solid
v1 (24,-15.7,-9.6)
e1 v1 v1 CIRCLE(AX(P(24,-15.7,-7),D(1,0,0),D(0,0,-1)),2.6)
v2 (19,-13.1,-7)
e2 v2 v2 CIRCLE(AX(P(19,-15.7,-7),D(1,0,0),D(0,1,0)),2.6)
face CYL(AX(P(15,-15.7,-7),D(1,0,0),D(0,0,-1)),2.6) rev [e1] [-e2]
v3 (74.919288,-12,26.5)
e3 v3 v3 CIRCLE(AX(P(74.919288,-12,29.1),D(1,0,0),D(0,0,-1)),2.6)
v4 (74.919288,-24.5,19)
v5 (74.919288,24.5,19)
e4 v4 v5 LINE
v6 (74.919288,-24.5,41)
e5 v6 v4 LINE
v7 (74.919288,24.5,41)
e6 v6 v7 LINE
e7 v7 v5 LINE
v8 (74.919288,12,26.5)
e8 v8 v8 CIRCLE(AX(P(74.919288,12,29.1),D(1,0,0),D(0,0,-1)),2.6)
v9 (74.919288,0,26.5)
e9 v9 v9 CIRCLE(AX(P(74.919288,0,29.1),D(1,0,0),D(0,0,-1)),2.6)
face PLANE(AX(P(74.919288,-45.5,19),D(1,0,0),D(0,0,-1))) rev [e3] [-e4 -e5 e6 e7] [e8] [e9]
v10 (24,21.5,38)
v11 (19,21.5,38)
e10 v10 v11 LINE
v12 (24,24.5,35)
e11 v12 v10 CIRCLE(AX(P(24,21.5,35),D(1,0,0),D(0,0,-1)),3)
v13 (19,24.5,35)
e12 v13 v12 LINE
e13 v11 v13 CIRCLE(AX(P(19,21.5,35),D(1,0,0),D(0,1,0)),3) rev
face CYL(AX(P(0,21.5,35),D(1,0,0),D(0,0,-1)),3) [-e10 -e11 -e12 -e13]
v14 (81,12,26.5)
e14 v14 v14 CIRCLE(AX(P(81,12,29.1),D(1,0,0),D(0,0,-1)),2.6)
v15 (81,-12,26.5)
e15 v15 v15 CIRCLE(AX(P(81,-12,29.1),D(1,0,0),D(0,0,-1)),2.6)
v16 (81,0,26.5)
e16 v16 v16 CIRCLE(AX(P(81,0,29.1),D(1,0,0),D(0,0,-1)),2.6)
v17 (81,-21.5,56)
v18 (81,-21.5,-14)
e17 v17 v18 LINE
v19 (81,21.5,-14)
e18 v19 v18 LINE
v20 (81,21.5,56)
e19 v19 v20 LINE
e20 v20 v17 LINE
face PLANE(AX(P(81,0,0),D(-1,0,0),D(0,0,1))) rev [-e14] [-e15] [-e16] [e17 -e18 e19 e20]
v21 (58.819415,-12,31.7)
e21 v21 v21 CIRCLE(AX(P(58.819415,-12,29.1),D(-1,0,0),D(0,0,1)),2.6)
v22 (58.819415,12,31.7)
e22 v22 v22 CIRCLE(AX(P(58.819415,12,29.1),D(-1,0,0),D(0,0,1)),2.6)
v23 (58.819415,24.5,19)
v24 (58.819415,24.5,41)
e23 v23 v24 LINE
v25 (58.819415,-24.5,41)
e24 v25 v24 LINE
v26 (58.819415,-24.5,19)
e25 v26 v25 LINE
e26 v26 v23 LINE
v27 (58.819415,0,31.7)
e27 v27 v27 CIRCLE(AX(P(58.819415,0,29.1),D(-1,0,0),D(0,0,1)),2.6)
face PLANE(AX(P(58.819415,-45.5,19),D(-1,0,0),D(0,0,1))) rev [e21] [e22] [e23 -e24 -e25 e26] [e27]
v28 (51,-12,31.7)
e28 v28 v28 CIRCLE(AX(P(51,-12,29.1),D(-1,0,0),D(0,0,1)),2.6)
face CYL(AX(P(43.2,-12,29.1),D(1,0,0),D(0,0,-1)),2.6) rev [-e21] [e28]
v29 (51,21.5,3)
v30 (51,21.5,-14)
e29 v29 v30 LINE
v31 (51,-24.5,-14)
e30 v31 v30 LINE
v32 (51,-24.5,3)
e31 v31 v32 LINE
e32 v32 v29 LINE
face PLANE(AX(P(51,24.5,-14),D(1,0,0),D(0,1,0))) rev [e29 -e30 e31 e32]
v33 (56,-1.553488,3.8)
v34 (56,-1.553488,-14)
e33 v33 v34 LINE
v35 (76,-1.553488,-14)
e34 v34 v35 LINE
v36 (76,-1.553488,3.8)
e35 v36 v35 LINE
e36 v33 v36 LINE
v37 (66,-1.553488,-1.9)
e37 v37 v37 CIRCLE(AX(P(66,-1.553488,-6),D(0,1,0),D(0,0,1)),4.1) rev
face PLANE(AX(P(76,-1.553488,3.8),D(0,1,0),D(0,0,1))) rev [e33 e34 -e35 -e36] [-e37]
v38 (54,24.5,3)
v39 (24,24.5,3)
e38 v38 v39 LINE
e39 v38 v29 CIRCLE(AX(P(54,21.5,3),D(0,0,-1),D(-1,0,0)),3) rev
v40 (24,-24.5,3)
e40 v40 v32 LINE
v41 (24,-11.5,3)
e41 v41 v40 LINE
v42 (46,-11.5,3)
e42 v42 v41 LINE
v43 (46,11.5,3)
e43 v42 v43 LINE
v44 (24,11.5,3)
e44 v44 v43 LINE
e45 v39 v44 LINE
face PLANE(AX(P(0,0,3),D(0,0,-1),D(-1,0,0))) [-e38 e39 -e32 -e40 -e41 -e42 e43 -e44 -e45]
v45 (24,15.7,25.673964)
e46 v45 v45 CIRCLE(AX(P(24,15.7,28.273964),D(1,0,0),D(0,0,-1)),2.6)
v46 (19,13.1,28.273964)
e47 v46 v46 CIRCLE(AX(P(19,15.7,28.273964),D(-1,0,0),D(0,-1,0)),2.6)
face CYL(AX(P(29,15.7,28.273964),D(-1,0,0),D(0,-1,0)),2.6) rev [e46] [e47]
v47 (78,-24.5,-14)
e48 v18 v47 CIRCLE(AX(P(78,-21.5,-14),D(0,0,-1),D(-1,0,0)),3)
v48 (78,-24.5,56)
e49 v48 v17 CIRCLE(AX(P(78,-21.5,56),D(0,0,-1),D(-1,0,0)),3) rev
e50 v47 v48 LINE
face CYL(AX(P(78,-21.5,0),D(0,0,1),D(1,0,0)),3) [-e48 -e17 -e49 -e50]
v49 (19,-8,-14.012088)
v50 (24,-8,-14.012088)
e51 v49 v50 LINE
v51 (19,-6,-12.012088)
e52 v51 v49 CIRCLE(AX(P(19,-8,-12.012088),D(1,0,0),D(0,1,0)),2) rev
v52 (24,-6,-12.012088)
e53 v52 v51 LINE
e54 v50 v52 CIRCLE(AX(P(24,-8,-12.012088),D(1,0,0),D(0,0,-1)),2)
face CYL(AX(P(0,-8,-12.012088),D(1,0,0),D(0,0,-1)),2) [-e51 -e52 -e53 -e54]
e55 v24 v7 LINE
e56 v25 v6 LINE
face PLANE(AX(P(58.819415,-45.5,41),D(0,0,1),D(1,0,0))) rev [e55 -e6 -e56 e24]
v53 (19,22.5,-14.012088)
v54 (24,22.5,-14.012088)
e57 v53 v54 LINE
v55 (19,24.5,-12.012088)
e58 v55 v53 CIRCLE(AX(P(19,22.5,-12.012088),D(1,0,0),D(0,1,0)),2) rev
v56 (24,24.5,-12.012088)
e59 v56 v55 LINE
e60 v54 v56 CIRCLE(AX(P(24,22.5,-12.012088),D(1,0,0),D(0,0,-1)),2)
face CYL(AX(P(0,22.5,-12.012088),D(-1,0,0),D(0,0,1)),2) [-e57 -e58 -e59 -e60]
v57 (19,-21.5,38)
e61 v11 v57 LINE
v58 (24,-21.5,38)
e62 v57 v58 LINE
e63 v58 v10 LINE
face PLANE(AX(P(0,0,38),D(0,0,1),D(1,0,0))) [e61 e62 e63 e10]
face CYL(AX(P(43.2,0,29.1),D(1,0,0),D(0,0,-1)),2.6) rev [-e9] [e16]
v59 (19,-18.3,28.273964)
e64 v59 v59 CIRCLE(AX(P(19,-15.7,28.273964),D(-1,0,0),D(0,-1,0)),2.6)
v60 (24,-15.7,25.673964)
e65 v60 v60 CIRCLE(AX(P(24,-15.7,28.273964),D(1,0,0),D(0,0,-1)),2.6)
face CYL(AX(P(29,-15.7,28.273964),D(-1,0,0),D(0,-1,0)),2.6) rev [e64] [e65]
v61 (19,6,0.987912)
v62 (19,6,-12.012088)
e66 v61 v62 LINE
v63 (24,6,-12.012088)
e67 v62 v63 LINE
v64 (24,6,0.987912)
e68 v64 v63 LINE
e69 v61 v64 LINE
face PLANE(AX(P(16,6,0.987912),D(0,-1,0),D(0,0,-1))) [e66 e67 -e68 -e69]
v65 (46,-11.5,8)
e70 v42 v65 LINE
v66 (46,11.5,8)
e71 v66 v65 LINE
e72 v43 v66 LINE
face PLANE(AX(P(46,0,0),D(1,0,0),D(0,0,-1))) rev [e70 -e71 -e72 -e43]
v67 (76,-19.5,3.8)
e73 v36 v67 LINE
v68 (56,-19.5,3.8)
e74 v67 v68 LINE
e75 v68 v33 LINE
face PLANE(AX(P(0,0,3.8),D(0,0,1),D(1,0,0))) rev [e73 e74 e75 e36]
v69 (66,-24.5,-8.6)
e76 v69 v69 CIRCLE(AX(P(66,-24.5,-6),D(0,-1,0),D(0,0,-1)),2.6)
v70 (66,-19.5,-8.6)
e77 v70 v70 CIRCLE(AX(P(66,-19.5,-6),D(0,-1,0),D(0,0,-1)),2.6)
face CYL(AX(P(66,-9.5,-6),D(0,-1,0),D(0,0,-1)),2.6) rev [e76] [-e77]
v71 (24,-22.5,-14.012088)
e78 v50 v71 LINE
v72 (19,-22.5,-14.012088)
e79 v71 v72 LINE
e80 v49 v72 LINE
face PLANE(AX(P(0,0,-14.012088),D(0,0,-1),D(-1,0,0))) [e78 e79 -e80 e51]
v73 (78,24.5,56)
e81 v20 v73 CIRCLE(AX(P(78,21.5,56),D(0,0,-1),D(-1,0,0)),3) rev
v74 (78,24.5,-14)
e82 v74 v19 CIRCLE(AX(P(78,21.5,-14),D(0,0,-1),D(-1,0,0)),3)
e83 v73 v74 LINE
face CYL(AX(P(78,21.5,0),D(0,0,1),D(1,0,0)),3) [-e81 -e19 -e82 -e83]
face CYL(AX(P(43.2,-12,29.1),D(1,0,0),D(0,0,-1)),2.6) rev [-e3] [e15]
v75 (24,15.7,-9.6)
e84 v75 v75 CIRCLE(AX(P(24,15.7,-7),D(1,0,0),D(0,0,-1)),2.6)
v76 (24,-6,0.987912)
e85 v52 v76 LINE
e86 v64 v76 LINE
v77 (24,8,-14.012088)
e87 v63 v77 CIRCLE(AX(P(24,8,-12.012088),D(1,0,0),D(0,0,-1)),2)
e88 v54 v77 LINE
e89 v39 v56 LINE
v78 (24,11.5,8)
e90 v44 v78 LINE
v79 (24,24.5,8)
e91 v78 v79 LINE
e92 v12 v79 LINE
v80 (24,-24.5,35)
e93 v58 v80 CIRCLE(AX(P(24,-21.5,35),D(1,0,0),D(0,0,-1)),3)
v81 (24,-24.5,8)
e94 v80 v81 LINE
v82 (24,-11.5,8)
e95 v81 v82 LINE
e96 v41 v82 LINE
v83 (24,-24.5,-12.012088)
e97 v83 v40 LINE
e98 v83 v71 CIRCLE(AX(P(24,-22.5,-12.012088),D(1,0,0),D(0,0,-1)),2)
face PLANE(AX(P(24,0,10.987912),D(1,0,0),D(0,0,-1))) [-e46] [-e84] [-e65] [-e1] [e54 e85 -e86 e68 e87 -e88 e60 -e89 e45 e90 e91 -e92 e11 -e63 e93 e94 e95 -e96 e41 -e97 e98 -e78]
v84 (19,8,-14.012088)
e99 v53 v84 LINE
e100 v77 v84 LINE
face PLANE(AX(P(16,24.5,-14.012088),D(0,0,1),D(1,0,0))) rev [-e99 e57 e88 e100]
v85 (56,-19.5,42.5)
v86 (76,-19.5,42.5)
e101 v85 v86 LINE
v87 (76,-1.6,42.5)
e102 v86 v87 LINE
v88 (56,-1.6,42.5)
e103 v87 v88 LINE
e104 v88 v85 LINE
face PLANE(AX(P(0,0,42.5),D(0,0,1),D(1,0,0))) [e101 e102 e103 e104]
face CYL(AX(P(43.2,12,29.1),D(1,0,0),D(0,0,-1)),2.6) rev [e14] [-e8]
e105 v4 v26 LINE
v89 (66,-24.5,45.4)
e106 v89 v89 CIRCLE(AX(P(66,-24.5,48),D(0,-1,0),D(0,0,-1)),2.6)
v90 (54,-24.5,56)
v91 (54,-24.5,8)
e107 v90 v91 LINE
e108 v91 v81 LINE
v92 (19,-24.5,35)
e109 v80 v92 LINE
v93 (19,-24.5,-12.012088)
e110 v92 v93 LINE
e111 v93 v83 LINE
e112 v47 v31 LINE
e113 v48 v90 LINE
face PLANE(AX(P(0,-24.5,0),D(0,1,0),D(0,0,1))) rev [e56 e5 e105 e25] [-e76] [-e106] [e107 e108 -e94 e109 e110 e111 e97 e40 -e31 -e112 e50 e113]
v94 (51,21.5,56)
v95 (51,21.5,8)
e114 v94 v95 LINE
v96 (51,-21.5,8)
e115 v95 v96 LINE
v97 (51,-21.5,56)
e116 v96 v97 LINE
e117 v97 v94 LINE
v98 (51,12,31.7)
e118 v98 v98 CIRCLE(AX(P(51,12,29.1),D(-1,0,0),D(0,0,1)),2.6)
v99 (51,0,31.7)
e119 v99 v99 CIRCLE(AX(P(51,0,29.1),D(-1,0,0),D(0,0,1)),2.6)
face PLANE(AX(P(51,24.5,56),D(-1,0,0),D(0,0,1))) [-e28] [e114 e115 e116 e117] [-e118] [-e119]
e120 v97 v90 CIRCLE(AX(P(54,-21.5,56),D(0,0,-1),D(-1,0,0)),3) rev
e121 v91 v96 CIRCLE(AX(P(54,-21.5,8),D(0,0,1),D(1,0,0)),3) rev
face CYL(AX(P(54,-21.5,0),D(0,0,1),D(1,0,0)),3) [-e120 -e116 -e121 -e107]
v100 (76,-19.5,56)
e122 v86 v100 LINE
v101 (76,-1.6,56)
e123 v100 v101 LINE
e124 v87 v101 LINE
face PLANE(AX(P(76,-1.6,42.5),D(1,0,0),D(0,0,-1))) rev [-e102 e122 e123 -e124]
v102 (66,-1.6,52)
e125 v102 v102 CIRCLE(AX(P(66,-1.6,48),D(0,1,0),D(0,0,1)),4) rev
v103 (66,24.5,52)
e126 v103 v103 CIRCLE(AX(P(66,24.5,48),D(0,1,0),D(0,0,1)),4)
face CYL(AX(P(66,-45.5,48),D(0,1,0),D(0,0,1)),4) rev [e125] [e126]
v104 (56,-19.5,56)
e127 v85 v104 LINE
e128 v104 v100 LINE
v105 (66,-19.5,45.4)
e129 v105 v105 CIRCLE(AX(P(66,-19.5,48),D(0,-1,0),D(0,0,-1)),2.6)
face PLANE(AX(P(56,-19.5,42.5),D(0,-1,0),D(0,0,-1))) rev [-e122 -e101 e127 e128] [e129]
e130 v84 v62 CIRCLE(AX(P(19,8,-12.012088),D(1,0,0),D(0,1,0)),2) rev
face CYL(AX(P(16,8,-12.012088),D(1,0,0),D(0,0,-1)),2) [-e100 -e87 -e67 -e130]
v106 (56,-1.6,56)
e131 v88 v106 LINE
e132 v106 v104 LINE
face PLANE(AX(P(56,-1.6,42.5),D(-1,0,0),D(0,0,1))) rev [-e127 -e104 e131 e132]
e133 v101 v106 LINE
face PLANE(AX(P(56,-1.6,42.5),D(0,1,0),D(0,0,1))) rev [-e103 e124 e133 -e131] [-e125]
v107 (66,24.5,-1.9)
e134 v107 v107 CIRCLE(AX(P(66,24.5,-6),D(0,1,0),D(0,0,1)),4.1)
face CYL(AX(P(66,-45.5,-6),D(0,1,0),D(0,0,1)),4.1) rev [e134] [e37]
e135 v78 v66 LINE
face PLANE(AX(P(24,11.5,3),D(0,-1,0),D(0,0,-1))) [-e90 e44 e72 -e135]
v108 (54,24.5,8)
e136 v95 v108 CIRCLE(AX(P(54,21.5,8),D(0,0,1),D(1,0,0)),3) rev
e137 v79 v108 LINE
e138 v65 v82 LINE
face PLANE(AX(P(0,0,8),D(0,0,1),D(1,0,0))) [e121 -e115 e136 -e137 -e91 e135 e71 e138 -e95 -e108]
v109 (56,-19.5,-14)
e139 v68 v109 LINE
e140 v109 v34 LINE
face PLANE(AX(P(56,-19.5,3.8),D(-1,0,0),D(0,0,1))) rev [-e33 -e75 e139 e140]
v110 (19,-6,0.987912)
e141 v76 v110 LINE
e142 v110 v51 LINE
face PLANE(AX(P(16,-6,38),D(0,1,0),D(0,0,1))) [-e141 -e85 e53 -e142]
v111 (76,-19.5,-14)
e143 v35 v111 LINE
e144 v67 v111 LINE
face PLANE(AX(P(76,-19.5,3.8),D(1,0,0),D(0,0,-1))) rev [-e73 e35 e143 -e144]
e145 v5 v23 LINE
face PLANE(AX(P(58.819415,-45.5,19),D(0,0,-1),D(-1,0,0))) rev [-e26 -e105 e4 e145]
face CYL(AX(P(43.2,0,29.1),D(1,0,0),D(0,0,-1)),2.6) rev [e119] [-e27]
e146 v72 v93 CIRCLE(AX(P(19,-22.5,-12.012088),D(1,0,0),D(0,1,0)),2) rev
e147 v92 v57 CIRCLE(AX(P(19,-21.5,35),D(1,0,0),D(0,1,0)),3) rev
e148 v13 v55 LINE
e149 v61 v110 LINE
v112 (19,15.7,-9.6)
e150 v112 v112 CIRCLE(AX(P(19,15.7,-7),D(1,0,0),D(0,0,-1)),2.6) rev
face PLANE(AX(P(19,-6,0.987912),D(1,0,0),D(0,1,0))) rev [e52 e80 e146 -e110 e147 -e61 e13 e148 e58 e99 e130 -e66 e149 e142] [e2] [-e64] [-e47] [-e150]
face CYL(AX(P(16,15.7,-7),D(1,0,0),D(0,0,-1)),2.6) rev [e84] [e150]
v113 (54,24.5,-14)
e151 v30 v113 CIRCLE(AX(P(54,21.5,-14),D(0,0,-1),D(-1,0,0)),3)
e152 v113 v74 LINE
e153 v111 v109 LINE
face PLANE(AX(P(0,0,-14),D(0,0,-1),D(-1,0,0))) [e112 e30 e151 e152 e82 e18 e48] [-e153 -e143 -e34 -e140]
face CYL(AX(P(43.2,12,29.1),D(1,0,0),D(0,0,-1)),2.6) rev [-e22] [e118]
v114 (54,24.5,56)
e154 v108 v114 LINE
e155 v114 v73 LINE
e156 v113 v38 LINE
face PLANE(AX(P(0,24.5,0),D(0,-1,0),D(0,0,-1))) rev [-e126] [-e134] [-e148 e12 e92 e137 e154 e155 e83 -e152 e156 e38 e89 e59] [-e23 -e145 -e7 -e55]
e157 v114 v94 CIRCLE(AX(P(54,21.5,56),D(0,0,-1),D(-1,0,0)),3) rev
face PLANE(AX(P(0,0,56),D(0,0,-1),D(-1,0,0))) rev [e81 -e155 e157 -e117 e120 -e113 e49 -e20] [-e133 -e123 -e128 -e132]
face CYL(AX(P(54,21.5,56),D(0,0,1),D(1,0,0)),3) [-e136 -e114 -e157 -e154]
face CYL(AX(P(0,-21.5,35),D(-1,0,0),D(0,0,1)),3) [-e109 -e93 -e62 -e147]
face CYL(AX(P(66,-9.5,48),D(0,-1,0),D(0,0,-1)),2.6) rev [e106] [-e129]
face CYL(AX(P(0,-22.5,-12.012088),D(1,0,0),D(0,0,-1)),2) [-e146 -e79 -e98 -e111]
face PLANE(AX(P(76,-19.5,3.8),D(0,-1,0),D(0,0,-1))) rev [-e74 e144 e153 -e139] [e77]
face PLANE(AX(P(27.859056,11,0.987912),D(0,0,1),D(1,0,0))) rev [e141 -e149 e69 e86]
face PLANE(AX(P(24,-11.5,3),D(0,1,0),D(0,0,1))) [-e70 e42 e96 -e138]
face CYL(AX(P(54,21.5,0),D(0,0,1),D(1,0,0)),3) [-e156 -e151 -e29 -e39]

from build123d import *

# Parameters (mm, degrees)
SKETCH1_R            = 11
BOSS_EXTRUDE1_DEPTH  = 3
SKETCH2_R            = 5.25
CUT_EXTRUDE1_DEPTH   = 16.842979518
SKETCH3_R            = 1.5
SKETCH3_R_2          = 1.545696852
CUT_EXTRUDE2_DEPTH   = 16.842979518
SKETCH4_W            = 27.859055967
SKETCH4_H            = 2.012088195
BOSS_EXTRUDE3_DEPTH  = 11
SKETCH5_R            = 5.25
CUT_EXTRUDE3_DEPTH   = 31.019585245
SKETCH6_R            = 1.5
SKETCH6_R_2          = 1.545696852
CUT_EXTRUDE4_DEPTH   = 31.101943449
CUT_EXTRUDE5_DEPTH   = 10
BOSS_EXTRUDE5_START  = 5
SKETCH10_R           = 1.5
SKETCH10_R_2         = 5.25
SKETCH10_R_3         = 1.545696852
BOSS_EXTRUDE5_DEPTH  = 5
SKETCH11_W           = 18
SKETCH11_H           = 7.012088195
BOSS_EXTRUDE7_DEPTH  = 13
SKETCH13_W           = 6
SKETCH13_H           = 8
BOSS_EXTRUDE8_DEPTH  = 10
SKETCH14_W           = 18
SKETCH14_H           = 1.5
CUT_EXTRUDE6_DEPTH   = 10
SKETCH15_W           = 8
SKETCH15_H           = 8
BOSS_EXTRUDE9_DEPTH  = 30
SKETCH16_W           = 2
SKETCH16_H           = 8
BOSS_EXTRUDE10_DEPTH = 10
SKETCH18_W           = 47.012088195
SKETCH18_H           = 3.5
BOSS_EXTRUDE11_DEPTH = 8
SKETCH19_W           = 47.012088195
SKETCH19_H           = 5
BOSS_EXTRUDE12_DEPTH = 8
SKETCH20_R           = 2.75
CUT_EXTRUDE7_DEPTH   = 8
SKETCH21_W           = 30
SKETCH21_H           = 16.5
CUT_EXTRUDE8_DEPTH   = 8
BOSS_EXTRUDE13_DEPTH = 2
FILLET4_R            = 2
SKETCH24_W           = 18
SKETCH24_H           = 7.012088195
BOSS_EXTRUDE14_DEPTH = 13.5
SKETCH25_W           = 10.228009428
SKETCH25_H           = 18.5
BOSS_EXTRUDE15_DEPTH = 8
SKETCH26_R           = 2.6
CUT_EXTRUDE9_DEPTH   = 8
FILLET6_R            = 2
SKETCH27_W           = 8.492399871
SKETCH27_H           = 8.837619377
BOSS_EXTRUDE16_DEPTH = 8
SKETCH28_W           = 9.389970589
SKETCH28_H           = 7.249609645
BOSS_EXTRUDE17_DEPTH = 8
SKETCH30_W           = 8
SKETCH30_H           = 2
BOSS_EXTRUDE19_DEPTH = 8
SKETCH31_W           = 8
SKETCH31_H           = 2
BOSS_EXTRUDE20_DEPTH = 8
SKETCH32_W           = 8
SKETCH32_H           = 18.5
BOSS_EXTRUDE22_DEPTH = 5
SKETCH33_W           = 8
SKETCH33_H           = 18.5
BOSS_EXTRUDE23_DEPTH = 5
SKETCH34_R           = 2.6
CUT_EXTRUDE11_DEPTH  = 46.033658305
SKETCH35_R           = 2.6
CUT_EXTRUDE12_DEPTH  = 46.033658305
SKETCH36_W           = 8
SKETCH36_H           = 0.228009428
CUT_EXTRUDE13_DEPTH  = 57.389541409
SKETCH37_W           = 3
SKETCH37_H           = 18.5
CUT_EXTRUDE14_DEPTH  = 15
SKETCH38_W           = 3
SKETCH38_H           = 18.5
CUT_EXTRUDE15_DEPTH  = 15
FILLET9_R            = 2
SKETCH39_W           = 8.423355969
SKETCH39_H           = 9.735190095
SKETCH39_W_2         = 8.630487673
SKETCH39_H_2         = 8.354312067
BOSS_EXTRUDE24_DEPTH = 8
SKETCH40_R           = 2.6
CUT_EXTRUDE16_DEPTH  = 8
SKETCH41_W           = 3
SKETCH41_H           = 9.735190095
CUT_EXTRUDE18_DEPTH  = 9
SKETCH42_W           = 3
SKETCH42_H           = 8.354312067
CUT_EXTRUDE19_DEPTH  = 9
SKETCH43_R           = 2.6
CUT_EXTRUDE20_DEPTH  = 9
SKETCH48_W           = 22
SKETCH48_H           = 13
BOSS_EXTRUDE26_DEPTH = 5
SKETCH49_W           = 22
SKETCH49_H           = 13
BOSS_EXTRUDE27_DEPTH = 5
SKETCH50_W           = 5
SKETCH50_H           = 49
BOSS_EXTRUDE28_DEPTH = 15
SKETCH51_W           = 55
SKETCH51_H           = 5
BOSS_EXTRUDE29_DEPTH = 42.8
SKETCH52_W           = 55
SKETCH52_H           = 5
BOSS_EXTRUDE30_DEPTH = 47.8
SKETCH53_W           = 55
SKETCH53_H           = 5
BOSS_EXTRUDE31_DEPTH = 47.8
SKETCH55_W           = 15
SKETCH55_H           = 47.8
CUT_EXTRUDE21_DEPTH  = 128.298389621
SKETCH57_W           = 47.8
SKETCH57_H           = 52.8
BOSS_EXTRUDE32_DEPTH = 5
SKETCH58_R           = 11.5
CUT_EXTRUDE25_DEPTH  = 111.385370407
SKETCH61_W           = 25
SKETCH61_H           = 27.8
CUT_EXTRUDE26_DEPTH  = 128.298389621
SKETCH62_R           = 1.75
CUT_EXTRUDE28_DEPTH  = 108.656537191
SKETCH63_R           = 1.75
CUT_EXTRUDE29_DEPTH  = 108.656537191
SKETCH64_R           = 1.75
CUT_EXTRUDE30_DEPTH  = 108.656537191
SKETCH65_R           = 1.75
CUT_EXTRUDE31_DEPTH  = 108.656537191
SKETCH67_W           = 5
SKETCH67_H           = 49
BOSS_EXTRUDE33_DEPTH = 5
SKETCH68_W           = 15
SKETCH68_H           = 17.012088195
SKETCH68_H_2         = 47.8
BOSS_EXTRUDE34_DEPTH = 15
BOSS_EXTRUDE36_DEPTH = 15
SKETCH70_R           = 4.1
CUT_EXTRUDE32_DEPTH  = 10
SKETCH72_W           = 18
SKETCH72_H           = 22
CUT_EXTRUDE33_DEPTH  = 139.003188369
FILLET10_R           = 4
FILLET12_R           = 4
FILLET13_R           = 4
SKETCH77_W           = 36.444620244
SKETCH77_H           = 50.862269336
CUT_EXTRUDE38_DEPTH  = 122.625059146
SKETCH78_W           = 45
SKETCH78_H           = 47.8
CUT_EXTRUDE39_DEPTH  = 119.630223805
SKETCH79_W           = 31.43111071
SKETCH79_H           = 18.51831177
CUT_EXTRUDE40_DEPTH  = 110.889216941
SKETCH80_W           = 62
SKETCH80_H           = 47.8
CUT_EXTRUDE41_DEPTH  = 110.889216941
SKETCH81_R           = 11
CUT_EXTRUDE42_DEPTH  = 86.776387285
SKETCH85_W           = 30
SKETCH85_H           = 49
BOSS_EXTRUDE37_DEPTH = 17
SKETCH86_W           = 30
SKETCH86_H           = 49
BOSS_EXTRUDE39_DEPTH = 70
SKETCH87_R           = 4.1
SKETCH87_R_2         = 4
SKETCH87_W           = 16.099872219
SKETCH87_H           = 22
CUT_EXTRUDE43_DEPTH  = 70
FILLET17_R           = 3
SKETCH89_W           = 5
SKETCH89_H           = 49
BOSS_EXTRUDE40_DEPTH = 30
SKETCH92_R           = 2.6
CUT_EXTRUDE44_DEPTH  = 10
FILLET18_R           = 3
SKETCH93_W           = 20
SKETCH93_H           = 17.946512219
CUT_EXTRUDE45_DEPTH  = 17.8
SKETCH98_R           = 2.6
CUT_EXTRUDE46_DEPTH  = 37.8
SKETCH99_R           = 2.6
CUT_EXTRUDE48_DEPTH  = 37.8
SKETCH100_R          = 2.6
CUT_EXTRUDE49_DEPTH  = 37.8
SKETCH102_W          = 20
SKETCH102_H          = 17.9
CUT_EXTRUDE50_DEPTH  = 13.5
SKETCH103_W          = 11.73949016
SKETCH103_H          = 10.259722493
BOSS_EXTRUDE41_DEPTH = 5
SKETCH104_W          = 13.021955472
SKETCH104_H          = 9.865117781
BOSS_EXTRUDE42_DEPTH = 5
SKETCH105_R          = 2.6
CUT_EXTRUDE51_DEPTH  = 15


with BuildPart() as part:
    # Sketch1 → Boss-Extrude1 (new body)
    with BuildSketch(Plane.XY):
        Circle(SKETCH1_R)
    extrude(amount=BOSS_EXTRUDE1_DEPTH)

    # Sketch2 → Cut-Extrude1 (cut, through all)
    with BuildSketch(Plane.XY.offset(3)):
        Circle(SKETCH2_R)
    extrude(amount=-CUT_EXTRUDE1_DEPTH, mode=Mode.SUBTRACT)

    # Sketch3 → Cut-Extrude2 (cut, through all)
    with BuildSketch(Plane.XY.offset(3)):
        with Locations((0, 8.5)):
            Circle(SKETCH3_R)
        with Locations((-8.5, 0)):
            Circle(SKETCH3_R)
        with Locations((0, -8.5)):
            Circle(SKETCH3_R_2)
        with Locations((8.5, 0)):
            Circle(SKETCH3_R)
    extrude(amount=-CUT_EXTRUDE2_DEPTH, mode=Mode.SUBTRACT)

    # Sketch4 → Boss-Extrude3 (add, symmetric)
    with BuildSketch(Plane(origin=(0, 0, 0), x_dir=(1, 0, 0), z_dir=(0, 1, 0))):
        with Locations((13.929527984, -1.993955902)):
            Rectangle(SKETCH4_W, SKETCH4_H)
    extrude(amount=BOSS_EXTRUDE3_DEPTH, both=True)

    # Sketch5 → Cut-Extrude3 (cut, through all)
    with BuildSketch(Plane(origin=(0, 0, 0.987911805), x_dir=(-1, 0, 0), z_dir=(0, 0, -1))):
        with Locations(Location((0, 0, 0), (0, 0, 180))):
            Circle(SKETCH5_R)
    extrude(amount=-CUT_EXTRUDE3_DEPTH, mode=Mode.SUBTRACT)

    # Sketch6 → Cut-Extrude4 (cut, through all)
    with BuildSketch(Plane(origin=(0, 0, 0), x_dir=(-1, 0, 0), z_dir=(0, 0, -1))):
        with Locations(Location((-8.5, 0, 0), (0, 0, 180))):
            Circle(SKETCH6_R)
        with Locations(Location((0, 8.5, 0), (0, 0, 180))):
            Circle(SKETCH6_R)
        with Locations(Location((0, -8.5, 0), (0, 0, 180))):
            Circle(SKETCH6_R_2)
    extrude(amount=-CUT_EXTRUDE4_DEPTH, mode=Mode.SUBTRACT)

    # Sketch7 → Cut-Extrude5 (cut)
    with BuildSketch(Plane(origin=(0, 0, 0.987911805), x_dir=(-1, 0, 0), z_dir=(0, 0, -1))):
        Polygon((-24, 11), (-27.859055967, 11), (-27.859055967, -11), (-24, -11), (-24, 0), align=None)
    extrude(amount=-CUT_EXTRUDE5_DEPTH, mode=Mode.SUBTRACT)

    # Sketch10 → Boss-Extrude5 (add)
    with BuildSketch(Plane.XY.offset(3).offset(BOSS_EXTRUDE5_START)):
        with BuildLine():
            Line((0, -11), (24, -11))
            Line((24, -11), (24, 11))
            Line((24, 11), (0, 11))
            ThreePointArc((0, 11), (-11, 0), (0, -11))
        make_face()
        with Locations((0, 8.5)):
            Circle(SKETCH10_R, mode=Mode.SUBTRACT)
        Circle(SKETCH10_R_2, mode=Mode.SUBTRACT)
        with Locations((0, -8.5)):
            Circle(SKETCH10_R_3, mode=Mode.SUBTRACT)
        with Locations((8.5, 0)):
            Circle(SKETCH10_R, mode=Mode.SUBTRACT)
        with Locations((-8.5, 0)):
            Circle(SKETCH10_R, mode=Mode.SUBTRACT)
    extrude(amount=-BOSS_EXTRUDE5_DEPTH)

    # Sketch11 → Boss-Extrude7 (add)
    with BuildSketch(Plane.XZ.offset(11)):
        with Locations((15, 4.493955902)):
            Rectangle(SKETCH11_W, SKETCH11_H)
    extrude(amount=BOSS_EXTRUDE7_DEPTH)

    # Sketch13 → Boss-Extrude8 (add)
    with BuildSketch(Plane(origin=(0, 0, 0.987911805), x_dir=(-1, 0, 0), z_dir=(0, 0, -1))):
        with Locations((-21, -18.5)):
            Rectangle(SKETCH13_W, SKETCH13_H)
    extrude(amount=BOSS_EXTRUDE8_DEPTH)

    # Sketch14 → Cut-Extrude6 (cut)
    with BuildSketch(Plane(origin=(0, 0, 0.987911805), x_dir=(-1, 0, 0), z_dir=(0, 0, -1))):
        with Locations((-15, -23.25)):
            Rectangle(SKETCH14_W, SKETCH14_H)
    extrude(amount=-CUT_EXTRUDE6_DEPTH, mode=Mode.SUBTRACT)

    # Sketch15 → Boss-Extrude9 (add)
    with BuildSketch(Plane.XY.offset(8)):
        with Locations((20, -18.5)):
            Rectangle(SKETCH15_W, SKETCH15_H)
    extrude(amount=BOSS_EXTRUDE9_DEPTH)

    # Sketch16 → Boss-Extrude10 (add)
    with BuildSketch(Plane(origin=(0, 0, 0.987911805), x_dir=(-1, 0, 0), z_dir=(0, 0, -1))):
        with Locations((-17, -18.5)):
            Rectangle(SKETCH16_W, SKETCH16_H)
    extrude(amount=BOSS_EXTRUDE10_DEPTH)

    # Sketch18 → Boss-Extrude11 (add)
    with BuildSketch(Plane(origin=(24, 0, 0), x_dir=(0, 0, -1), z_dir=(1, 0, 0))):
        with Locations((-14.493955902, -12.75)):
            Rectangle(SKETCH18_W, SKETCH18_H)
    extrude(amount=-BOSS_EXTRUDE11_DEPTH)

    # Sketch19 → Boss-Extrude12 (add)
    with BuildSketch(Plane(origin=(24, 0, 0), x_dir=(0, 0, -1), z_dir=(1, 0, 0))):
        with Locations((-14.493955902, -8.5)):
            Rectangle(SKETCH19_W, SKETCH19_H)
    extrude(amount=-BOSS_EXTRUDE12_DEPTH)

    # Sketch20 → Cut-Extrude7 (cut)
    with BuildSketch(Plane(origin=(24, 0, 0), x_dir=(0, 0, -1), z_dir=(1, 0, 0))):
        with Locations((2.797809472, -17)):
            Circle(SKETCH20_R)
    extrude(amount=-CUT_EXTRUDE7_DEPTH, mode=Mode.SUBTRACT)

    # Sketch21 → Cut-Extrude8 (cut)
    with BuildSketch(Plane(origin=(24, 0, 0), x_dir=(0, 0, -1), z_dir=(1, 0, 0))):
        with Locations((-23, -14.25)):
            Rectangle(SKETCH21_W, SKETCH21_H)
    extrude(amount=-CUT_EXTRUDE8_DEPTH, mode=Mode.SUBTRACT)

    # Sketch22 → Boss-Extrude13 (add)
    with BuildSketch(Plane.XZ.offset(22.5)):
        Polygon((6, 8), (24, 8), (24, -9.012088195), (16, -9.012088195), (16, 0.987911805), (6, 0.987911805), align=None)
    extrude(amount=BOSS_EXTRUDE13_DEPTH)

    # Fillet4
    fillet4_edges = [part.edges().sort_by_distance(p)[0] for p in [
        (20, -6, -9.012088195),
        (20, -24.5, -9.012088195),
    ]]
    fillet(fillet4_edges, radius=FILLET4_R)

    # Sketch24 → Boss-Extrude14 (add)
    with BuildSketch(Plane(origin=(0, 11, 0), x_dir=(1, 0, 0), z_dir=(0, 1, 0))):
        with Locations((15, -4.493955902)):
            Rectangle(SKETCH24_W, SKETCH24_H)
    extrude(amount=BOSS_EXTRUDE14_DEPTH)

    # Sketch25 → Boss-Extrude15 (add)
    with BuildSketch(Plane(origin=(24, 0, 0), x_dir=(0, 0, -1), z_dir=(1, 0, 0))):
        with Locations((4.126092909, 15.25)):
            Rectangle(SKETCH25_W, SKETCH25_H)
    extrude(amount=-BOSS_EXTRUDE15_DEPTH)

    # Sketch26 → Cut-Extrude9 (cut)
    with BuildSketch(Plane(origin=(24, 0, 0), x_dir=(0, 0, -1), z_dir=(1, 0, 0))):
        with Locations((2.797809472, 17)):
            Circle(SKETCH26_R)
    extrude(amount=-CUT_EXTRUDE9_DEPTH, mode=Mode.SUBTRACT)

    # Fillet6
    fillet6_edges = [part.edges().sort_by_distance(p)[0] for p in [
        (20, 24.5, -9.240097623),
        (20, 6, -9.240097623),
    ]]
    fillet(fillet6_edges, radius=FILLET6_R)

    # Sketch27 → Boss-Extrude16 (add)
    with BuildSketch(Plane(origin=(24, 0, 0), x_dir=(0, 0, -1), z_dir=(1, 0, 0))):
        with Locations((2.277102445, 17.019321692)):
            Rectangle(SKETCH27_W, SKETCH27_H)
    extrude(amount=-BOSS_EXTRUDE16_DEPTH)

    # Sketch28 → Boss-Extrude17 (add)
    with BuildSketch(Plane(origin=(24, 0, 0), x_dir=(0, 0, -1), z_dir=(1, 0, 0))):
        with Locations((2.173536592, -16.501492431)):
            Rectangle(SKETCH28_W, SKETCH28_H)
    extrude(amount=-BOSS_EXTRUDE17_DEPTH)

    # Sketch30 → Boss-Extrude19 (add)
    with BuildSketch(Plane(origin=(0, 0, -9.240097623), x_dir=(-1, 0, 0), z_dir=(0, 0, -1))):
        with Locations((-20, 23.5)):
            Rectangle(SKETCH30_W, SKETCH30_H)
        with Locations((-20, 7)):
            Rectangle(SKETCH30_W, SKETCH30_H)
    extrude(amount=-BOSS_EXTRUDE19_DEPTH)

    # Sketch31 → Boss-Extrude20 (add)
    with BuildSketch(Plane(origin=(0, 0, -9.012088195), x_dir=(-1, 0, 0), z_dir=(0, 0, -1))):
        with Locations((-20, -7)):
            Rectangle(SKETCH31_W, SKETCH31_H)
        with Locations((-20, -23.5)):
            Rectangle(SKETCH31_W, SKETCH31_H)
    extrude(amount=-BOSS_EXTRUDE20_DEPTH)

    # Sketch32 → Boss-Extrude22 (add)
    with BuildSketch(Plane(origin=(0, 0, -9.240097623), x_dir=(-1, 0, 0), z_dir=(0, 0, -1))):
        with Locations((-20, 15.25)):
            Rectangle(SKETCH32_W, SKETCH32_H)
    extrude(amount=BOSS_EXTRUDE22_DEPTH)

    # Sketch33 → Boss-Extrude23 (add)
    with BuildSketch(Plane(origin=(0, 0, -9.012088195), x_dir=(-1, 0, 0), z_dir=(0, 0, -1))):
        with Locations((-20, -15.25)):
            Rectangle(SKETCH33_W, SKETCH33_H)
    extrude(amount=BOSS_EXTRUDE23_DEPTH)

    # Sketch34 → Cut-Extrude11 (cut, through all)
    with BuildSketch(Plane(origin=(24, 0, 0), x_dir=(0, 0, -1), z_dir=(1, 0, 0))):
        with Locations((6.012088195, 16.7)):
            Circle(SKETCH34_R)
    extrude(amount=-CUT_EXTRUDE11_DEPTH, mode=Mode.SUBTRACT)

    # Sketch35 → Cut-Extrude12 (cut, through all)
    with BuildSketch(Plane(origin=(24, 0, 0), x_dir=(0, 0, -1), z_dir=(1, 0, 0))):
        with Locations((6.012088195, -16.7)):
            Circle(SKETCH35_R)
    extrude(amount=-CUT_EXTRUDE12_DEPTH, mode=Mode.SUBTRACT)

    # Sketch36 → Cut-Extrude13 (cut, through all)
    with BuildSketch(Plane.XZ.offset(24.5)):
        with Locations((20, -14.126092909)):
            Rectangle(SKETCH36_W, SKETCH36_H)
    extrude(amount=-CUT_EXTRUDE13_DEPTH, mode=Mode.SUBTRACT)

    # Sketch37 → Cut-Extrude14 (cut)
    with BuildSketch(Plane(origin=(0, 0, -14.012088195), x_dir=(-1, 0, 0), z_dir=(0, 0, -1))):
        with Locations((-17.5, -15.25)):
            Rectangle(SKETCH37_W, SKETCH37_H)
    extrude(amount=-CUT_EXTRUDE14_DEPTH, mode=Mode.SUBTRACT)

    # Sketch38 → Cut-Extrude15 (cut)
    with BuildSketch(Plane(origin=(0, 0, -14.012088195), x_dir=(-1, 0, 0), z_dir=(0, 0, -1))):
        with Locations((-17.5, 15.25)):
            Rectangle(SKETCH38_W, SKETCH38_H)
    extrude(amount=-CUT_EXTRUDE15_DEPTH, mode=Mode.SUBTRACT)

    # Fillet9
    fillet9_edges = [part.edges().sort_by_distance(p)[0] for p in [
        (21.5, -24.5, -14.012088195),
        (21.5, 6, -14.012088195),
        (21.5, 24.5, -14.012088195),
        (21.5, -6, -14.012088195),
    ]]
    fillet(fillet9_edges, radius=FILLET9_R)

    # Sketch39 → Boss-Extrude24 (add)
    with BuildSketch(Plane(origin=(24, 0, 0), x_dir=(0, 0, -1), z_dir=(1, 0, 0))):
        with Locations((6.768936723, 16.708624135)):
            Rectangle(SKETCH39_W, SKETCH39_H)
        with Locations((6.11301966, -16.846711938)):
            Rectangle(SKETCH39_W_2, SKETCH39_H_2)
    extrude(amount=-BOSS_EXTRUDE24_DEPTH)

    # Sketch40 → Cut-Extrude16 (cut)
    with BuildSketch(Plane(origin=(24, 0, 0), x_dir=(0, 0, -1), z_dir=(1, 0, 0))):
        with Locations((7, 15.7)):
            Circle(SKETCH40_R)
    extrude(amount=-CUT_EXTRUDE16_DEPTH, mode=Mode.SUBTRACT)

    # Sketch41 → Cut-Extrude18 (cut)
    with BuildSketch(Plane(origin=(0, 0, -10.980614707), x_dir=(-1, 0, 0), z_dir=(0, 0, -1))):
        with Locations((-17.5, 16.708624135)):
            Rectangle(SKETCH41_W, SKETCH41_H)
    extrude(amount=-CUT_EXTRUDE18_DEPTH, mode=Mode.SUBTRACT)

    # Sketch42 → Cut-Extrude19 (cut)
    with BuildSketch(Plane(origin=(0, 0, -10.428263496), x_dir=(-1, 0, 0), z_dir=(0, 0, -1))):
        with Locations((-17.5, -16.846711938)):
            Rectangle(SKETCH42_W, SKETCH42_H)
    extrude(amount=-CUT_EXTRUDE19_DEPTH, mode=Mode.SUBTRACT)

    # Sketch43 → Cut-Extrude20 (cut)
    with BuildSketch(Plane(origin=(24, 0, 0), x_dir=(0, 0, -1), z_dir=(1, 0, 0))):
        with Locations((7, -15.7)):
            Circle(SKETCH43_R)
    extrude(amount=-CUT_EXTRUDE20_DEPTH, mode=Mode.SUBTRACT)

    # Sketch48 → Boss-Extrude26 (add)
    with BuildSketch(Plane.XY.offset(8)):
        with Locations((35, -18)):
            Rectangle(SKETCH48_W, SKETCH48_H)
    extrude(amount=-BOSS_EXTRUDE26_DEPTH)

    # Sketch49 → Boss-Extrude27 (add)
    with BuildSketch(Plane.XY.offset(8)):
        with Locations((35, 18)):
            Rectangle(SKETCH49_W, SKETCH49_H)
    extrude(amount=-BOSS_EXTRUDE27_DEPTH)

    # Sketch50 → Boss-Extrude28 (add)
    with BuildSketch(Plane(origin=(46, 0, 0), x_dir=(0, 0, -1), z_dir=(1, 0, 0))):
        with Locations((-5.5, 0)):
            Rectangle(SKETCH50_W, SKETCH50_H)
    extrude(amount=BOSS_EXTRUDE28_DEPTH)

    # Sketch51 → Boss-Extrude29 (add)
    with BuildSketch(Plane.XY.offset(8)):
        with Locations((33.5, 22)):
            Rectangle(SKETCH51_W, SKETCH51_H)
    extrude(amount=BOSS_EXTRUDE29_DEPTH)

    # Sketch52 → Boss-Extrude30 (add)
    with BuildSketch(Plane.XZ.offset(-19.5)):
        with Locations((33.5, 53.3)):
            Rectangle(SKETCH52_W, SKETCH52_H)
    extrude(amount=-BOSS_EXTRUDE30_DEPTH)

    # Sketch53 → Boss-Extrude31 (add)
    with BuildSketch(Plane.XY.offset(55.8)):
        with Locations((33.5, 69.8)):
            Rectangle(SKETCH53_W, SKETCH53_H)
    extrude(amount=-BOSS_EXTRUDE31_DEPTH)

    # Sketch55 → Cut-Extrude21 (cut, through all)
    with BuildSketch(Plane(origin=(0, 72.3, 0), x_dir=(1, 0, 0), z_dir=(0, 1, 0))):
        with Locations((53.5, -31.9)):
            Rectangle(SKETCH55_W, SKETCH55_H)
    extrude(amount=-CUT_EXTRUDE21_DEPTH, mode=Mode.SUBTRACT)

    # Sketch57 → Boss-Extrude32 (add)
    with BuildSketch(Plane(origin=(46, 0, 0), x_dir=(0, 0, -1), z_dir=(1, 0, 0))):
        with Locations((-31.9, 45.9)):
            Rectangle(SKETCH57_W, SKETCH57_H)
    extrude(amount=BOSS_EXTRUDE32_DEPTH)

    # Sketch58 → Cut-Extrude25 (cut, through all)
    with BuildSketch(Plane(origin=(51, 0, 0), x_dir=(0, 0, -1), z_dir=(1, 0, 0))):
        with Locations((-29.4, 45.9)):
            Circle(SKETCH58_R)
    extrude(amount=-CUT_EXTRUDE25_DEPTH, mode=Mode.SUBTRACT)

    # Sketch61 → Cut-Extrude26 (cut, through all)
    with BuildSketch(Plane(origin=(0, 72.3, 0), x_dir=(1, 0, 0), z_dir=(0, 1, 0))):
        with Locations((28.5, -31.9)):
            Rectangle(SKETCH61_W, SKETCH61_H)
    extrude(amount=-CUT_EXTRUDE26_DEPTH, mode=Mode.SUBTRACT)

    # Sketch62 → Cut-Extrude28 (cut, through all)
    with BuildSketch(Plane.ZY.offset(-46)):
        with Locations((46.3, 29)):
            Circle(SKETCH62_R)
    extrude(amount=-CUT_EXTRUDE28_DEPTH, mode=Mode.SUBTRACT)

    # Sketch63 → Cut-Extrude29 (cut, through all)
    with BuildSketch(Plane.ZY.offset(-46)):
        with Locations((12.5, 29)):
            Circle(SKETCH63_R)
    extrude(amount=-CUT_EXTRUDE29_DEPTH, mode=Mode.SUBTRACT)

    # Sketch64 → Cut-Extrude30 (cut, through all)
    with BuildSketch(Plane.ZY.offset(-46)):
        with Locations((46.3, 62.8)):
            Circle(SKETCH64_R)
    extrude(amount=-CUT_EXTRUDE30_DEPTH, mode=Mode.SUBTRACT)

    # Sketch65 → Cut-Extrude31 (cut, through all)
    with BuildSketch(Plane.ZY.offset(-46)):
        with Locations((12.5, 62.8)):
            Circle(SKETCH65_R)
    extrude(amount=-CUT_EXTRUDE31_DEPTH, mode=Mode.SUBTRACT)

    # Sketch67 → Boss-Extrude33 (add)
    with BuildSketch(Plane(origin=(61, 0, 0), x_dir=(0, 0, -1), z_dir=(1, 0, 0))):
        with Locations((-5.5, 0)):
            Rectangle(SKETCH67_W, SKETCH67_H)
    extrude(amount=BOSS_EXTRUDE33_DEPTH)

    # Sketch68 → Boss-Extrude34 (add)
    with BuildSketch(Plane.XZ.offset(24.5)):
        with Locations((58.5, -5.506044098)):
            Rectangle(SKETCH68_W, SKETCH68_H)
        with Locations((58.5, 31.9)):
            Rectangle(SKETCH68_W, SKETCH68_H_2)
    extrude(amount=-BOSS_EXTRUDE34_DEPTH)

    # Sketch69 → Boss-Extrude36 (add)
    with BuildSketch(Plane(origin=(66, 0, 0), x_dir=(0, 0, -1), z_dir=(1, 0, 0))):
        Polygon((-55.8, -9.5), (-8, -9.5), (-8, 24.5), (-3, 24.5), (-3, -9.5), (14.012088195, -9.5), (14.012088195, -24.5), (-55.8, -24.5), align=None)
    extrude(amount=BOSS_EXTRUDE36_DEPTH)

    # Sketch70 → Cut-Extrude32 (cut)
    with BuildSketch(Plane.XZ.offset(24.5)):
        with Locations(Location((66, 47.8, 0), (0, 0, 270))):
            Circle(SKETCH70_R)
        with Locations(Location((66, -6.012088195, 0), (0, 0, 270))):
            Circle(SKETCH70_R)
    extrude(amount=-CUT_EXTRUDE32_DEPTH, mode=Mode.SUBTRACT)

    # Sketch72 → Cut-Extrude33 (cut, through all)
    with BuildSketch(Plane.XZ.offset(24.5)):
        with Locations((66, 29)):
            Rectangle(SKETCH72_W, SKETCH72_H)
    extrude(amount=-CUT_EXTRUDE33_DEPTH, mode=Mode.SUBTRACT)

    # Fillet10
    fillet10_edges = [part.edges().sort_by_distance(p)[0] for p in [
        (81, 24.5, 5.5),
    ]]
    fillet(fillet10_edges, radius=FILLET10_R)

    # Fillet12
    fillet12_edges = [part.edges().sort_by_distance(p)[0] for p in [
        (6, -24.5, 4.493955903),
    ]]
    fillet(fillet12_edges, radius=FILLET12_R)

    # Fillet13
    fillet13_edges = [part.edges().sort_by_distance(p)[0] for p in [
        (51, -9.5, 31.9),
        (51, -24.5, 31.9),
        (81, -24.5, 20.893955903),
        (81, -17, -14.012088195),
        (81, -9.5, -5.506044097),
        (81, -9.5, 31.9),
        (51, -9.5, -5.506044097),
        (51, -17, -14.012088195),
        (51, -24.5, -5.506044097),
    ]]
    fillet(fillet13_edges, radius=FILLET13_R)

    # Sketch77 → Cut-Extrude38 (cut, through all)
    with BuildSketch(Plane(origin=(0, 0, 0.987911805), x_dir=(-1, 0, 0), z_dir=(0, 0, -1))):
        with Locations((-0.777689878, -0.931134668)):
            Rectangle(SKETCH77_W, SKETCH77_H)
    extrude(amount=-CUT_EXTRUDE38_DEPTH, mode=Mode.SUBTRACT)


with BuildPart() as cut_extrude38_piece_1:
    # of the separate pieces the step leaves, piece 1, a body of its own (cut_extrude38_pieces)
    add(part.part.solids().sort_by_distance((55, -24.5, 8))[0])

    # Sketch78 → Cut-Extrude39 (cut, through all)
    with BuildSketch(Plane(origin=(0, 0, 8), x_dir=(-1, 0, 0), z_dir=(0, 0, -1))):
        with Locations((-28.5, 48.4)):
            Rectangle(SKETCH78_W, SKETCH78_H)
    extrude(amount=-CUT_EXTRUDE39_DEPTH, mode=Mode.SUBTRACT)

    # Sketch79 → Cut-Extrude40 (cut, through all)
    with BuildSketch(Plane.XZ.offset(24.5)):
        with Locations((66.715555355, -6.259155885)):
            Rectangle(SKETCH79_W, SKETCH79_H)
    extrude(amount=-CUT_EXTRUDE40_DEPTH, mode=Mode.SUBTRACT)

    # Sketch80 → Cut-Extrude41 (cut, through all)
    with BuildSketch(Plane(origin=(0, 24.5, 0), x_dir=(1, 0, 0), z_dir=(0, 1, 0))):
        with Locations((50, -31.9)):
            Rectangle(SKETCH80_W, SKETCH80_H)
    extrude(amount=-CUT_EXTRUDE41_DEPTH, mode=Mode.SUBTRACT)

    # Sketch85 → Boss-Extrude37 (add)
    with BuildSketch(Plane(origin=(0, 0, 3), x_dir=(-1, 0, 0), z_dir=(0, 0, -1))):
        with Locations((-66, 0)):
            Rectangle(SKETCH85_W, SKETCH85_H)
    extrude(amount=BOSS_EXTRUDE37_DEPTH)

    # Sketch86 → Boss-Extrude39 (add)
    with BuildSketch(Plane(origin=(0, 0, -14), x_dir=(-1, 0, 0), z_dir=(0, 0, -1))):
        with Locations((-66, 0)):
            Rectangle(SKETCH86_W, SKETCH86_H)
    extrude(amount=-BOSS_EXTRUDE39_DEPTH)

    # Sketch87 → Cut-Extrude43 (cut)
    with BuildSketch(Plane(origin=(0, 24.5, 0), x_dir=(1, 0, 0), z_dir=(0, 1, 0))):
        with Locations(Location((66, 6, 0), (0, 0, 270))):
            Circle(SKETCH87_R)
        with Locations(Location((66, -48, 0), (0, 0, 270))):
            Circle(SKETCH87_R_2)
        with Locations((66.869351407, -30)):
            Rectangle(SKETCH87_W, SKETCH87_H)
    extrude(amount=-CUT_EXTRUDE43_DEPTH, mode=Mode.SUBTRACT)

    # Fillet17
    fillet17_edges = [cut_extrude38_piece_1.edges().sort_by_distance(p)[0] for p in [
        (81, 24.5, 21),
        (81, -24.5, 21),
        (51, 24.5, -5.5),
        (51, 24.5, 32),
        (51, -24.5, 32),
    ]]
    fillet(fillet17_edges, radius=FILLET17_R)

    # Sketch89 → Boss-Extrude40 (add)
    with BuildSketch(Plane.XY.offset(8)):
        with Locations((21.5, 0)):
            Rectangle(SKETCH89_W, SKETCH89_H)
    extrude(amount=BOSS_EXTRUDE40_DEPTH)

    # Sketch92 → Cut-Extrude44 (cut)
    with BuildSketch(Plane.ZY.offset(-19)):
        with Locations(Location((28.273964411, 15.7, 0), (0, 0, 270))):
            Circle(SKETCH92_R)
        with Locations(Location((28.273964411, -15.7, 0), (0, 0, 270))):
            Circle(SKETCH92_R)
    extrude(amount=-CUT_EXTRUDE44_DEPTH, mode=Mode.SUBTRACT)

    # Fillet18
    fillet18_edges = [cut_extrude38_piece_1.edges().sort_by_distance(p)[0] for p in [
        (21.5, -24.5, 38),
        (21.5, 24.5, 38),
    ]]
    fillet(fillet18_edges, radius=FILLET18_R)

    # Sketch93 → Cut-Extrude45 (cut)
    with BuildSketch(Plane(origin=(0, 0, -14), x_dir=(-1, 0, 0), z_dir=(0, 0, -1))):
        with Locations((-66, -10.526743891)):
            Rectangle(SKETCH93_W, SKETCH93_H)
    extrude(amount=-CUT_EXTRUDE45_DEPTH, mode=Mode.SUBTRACT)

    # Sketch98 → Cut-Extrude46 (cut)
    with BuildSketch(Plane(origin=(81, 0, 0), x_dir=(0, 0, -1), z_dir=(1, 0, 0))):
        with Locations((-29.1, 0)):
            Circle(SKETCH98_R)
    extrude(amount=-CUT_EXTRUDE46_DEPTH, mode=Mode.SUBTRACT)

    # Sketch99 → Cut-Extrude48 (cut)
    with BuildSketch(Plane(origin=(81, 0, 0), x_dir=(0, 0, -1), z_dir=(1, 0, 0))):
        with Locations((-29.1, 12)):
            Circle(SKETCH99_R)
    extrude(amount=-CUT_EXTRUDE48_DEPTH, mode=Mode.SUBTRACT)

    # Sketch100 → Cut-Extrude49 (cut)
    with BuildSketch(Plane(origin=(81, 0, 0), x_dir=(0, 0, -1), z_dir=(1, 0, 0))):
        with Locations((-29.1, -12)):
            Circle(SKETCH100_R)
    extrude(amount=-CUT_EXTRUDE49_DEPTH, mode=Mode.SUBTRACT)

    # Sketch102 → Cut-Extrude50 (cut)
    with BuildSketch(Plane.XY.offset(56)):
        with Locations((66, -10.55)):
            Rectangle(SKETCH102_W, SKETCH102_H)
    extrude(amount=-CUT_EXTRUDE50_DEPTH, mode=Mode.SUBTRACT)

    # Sketch103 → Boss-Extrude41 (add)
    with BuildSketch(Plane.XZ.offset(24.5)):
        with Locations((66.178793162, 47.77775068)):
            Rectangle(SKETCH103_W, SKETCH103_H)
    extrude(amount=-BOSS_EXTRUDE41_DEPTH)

    # Sketch104 → Boss-Extrude42 (add)
    with BuildSketch(Plane.XZ.offset(24.5)):
        with Locations((66.228118751, -6.381745942)):
            Rectangle(SKETCH104_W, SKETCH104_H)
    extrude(amount=-BOSS_EXTRUDE42_DEPTH)

    # Sketch105 → Cut-Extrude51 (cut)
    with BuildSketch(Plane.XZ.offset(24.5)):
        with Locations(Location((66, 48, 0), (0, 0, 270))):
            Circle(SKETCH105_R)
        with Locations(Location((66, -6, 0), (0, 0, 270))):
            Circle(SKETCH105_R)
    extrude(amount=-CUT_EXTRUDE51_DEPTH, mode=Mode.SUBTRACT)


with BuildPart() as cut_extrude38_piece_2:
    # of the separate pieces the step leaves, piece 2, a body of its own (cut_extrude38_pieces)
    add(part.part.solids().sort_by_distance((11, 0, 0))[0])

    # Sketch81 → Cut-Extrude42 (cut, through all)
    with BuildSketch(Plane(origin=(0, 0, 0), x_dir=(-1, 0, 0), z_dir=(0, 0, -1))):
        Circle(SKETCH81_R)
    extrude(amount=-CUT_EXTRUDE42_DEPTH, mode=Mode.SUBTRACT)


solid = cut_extrude38_piece_1.part
